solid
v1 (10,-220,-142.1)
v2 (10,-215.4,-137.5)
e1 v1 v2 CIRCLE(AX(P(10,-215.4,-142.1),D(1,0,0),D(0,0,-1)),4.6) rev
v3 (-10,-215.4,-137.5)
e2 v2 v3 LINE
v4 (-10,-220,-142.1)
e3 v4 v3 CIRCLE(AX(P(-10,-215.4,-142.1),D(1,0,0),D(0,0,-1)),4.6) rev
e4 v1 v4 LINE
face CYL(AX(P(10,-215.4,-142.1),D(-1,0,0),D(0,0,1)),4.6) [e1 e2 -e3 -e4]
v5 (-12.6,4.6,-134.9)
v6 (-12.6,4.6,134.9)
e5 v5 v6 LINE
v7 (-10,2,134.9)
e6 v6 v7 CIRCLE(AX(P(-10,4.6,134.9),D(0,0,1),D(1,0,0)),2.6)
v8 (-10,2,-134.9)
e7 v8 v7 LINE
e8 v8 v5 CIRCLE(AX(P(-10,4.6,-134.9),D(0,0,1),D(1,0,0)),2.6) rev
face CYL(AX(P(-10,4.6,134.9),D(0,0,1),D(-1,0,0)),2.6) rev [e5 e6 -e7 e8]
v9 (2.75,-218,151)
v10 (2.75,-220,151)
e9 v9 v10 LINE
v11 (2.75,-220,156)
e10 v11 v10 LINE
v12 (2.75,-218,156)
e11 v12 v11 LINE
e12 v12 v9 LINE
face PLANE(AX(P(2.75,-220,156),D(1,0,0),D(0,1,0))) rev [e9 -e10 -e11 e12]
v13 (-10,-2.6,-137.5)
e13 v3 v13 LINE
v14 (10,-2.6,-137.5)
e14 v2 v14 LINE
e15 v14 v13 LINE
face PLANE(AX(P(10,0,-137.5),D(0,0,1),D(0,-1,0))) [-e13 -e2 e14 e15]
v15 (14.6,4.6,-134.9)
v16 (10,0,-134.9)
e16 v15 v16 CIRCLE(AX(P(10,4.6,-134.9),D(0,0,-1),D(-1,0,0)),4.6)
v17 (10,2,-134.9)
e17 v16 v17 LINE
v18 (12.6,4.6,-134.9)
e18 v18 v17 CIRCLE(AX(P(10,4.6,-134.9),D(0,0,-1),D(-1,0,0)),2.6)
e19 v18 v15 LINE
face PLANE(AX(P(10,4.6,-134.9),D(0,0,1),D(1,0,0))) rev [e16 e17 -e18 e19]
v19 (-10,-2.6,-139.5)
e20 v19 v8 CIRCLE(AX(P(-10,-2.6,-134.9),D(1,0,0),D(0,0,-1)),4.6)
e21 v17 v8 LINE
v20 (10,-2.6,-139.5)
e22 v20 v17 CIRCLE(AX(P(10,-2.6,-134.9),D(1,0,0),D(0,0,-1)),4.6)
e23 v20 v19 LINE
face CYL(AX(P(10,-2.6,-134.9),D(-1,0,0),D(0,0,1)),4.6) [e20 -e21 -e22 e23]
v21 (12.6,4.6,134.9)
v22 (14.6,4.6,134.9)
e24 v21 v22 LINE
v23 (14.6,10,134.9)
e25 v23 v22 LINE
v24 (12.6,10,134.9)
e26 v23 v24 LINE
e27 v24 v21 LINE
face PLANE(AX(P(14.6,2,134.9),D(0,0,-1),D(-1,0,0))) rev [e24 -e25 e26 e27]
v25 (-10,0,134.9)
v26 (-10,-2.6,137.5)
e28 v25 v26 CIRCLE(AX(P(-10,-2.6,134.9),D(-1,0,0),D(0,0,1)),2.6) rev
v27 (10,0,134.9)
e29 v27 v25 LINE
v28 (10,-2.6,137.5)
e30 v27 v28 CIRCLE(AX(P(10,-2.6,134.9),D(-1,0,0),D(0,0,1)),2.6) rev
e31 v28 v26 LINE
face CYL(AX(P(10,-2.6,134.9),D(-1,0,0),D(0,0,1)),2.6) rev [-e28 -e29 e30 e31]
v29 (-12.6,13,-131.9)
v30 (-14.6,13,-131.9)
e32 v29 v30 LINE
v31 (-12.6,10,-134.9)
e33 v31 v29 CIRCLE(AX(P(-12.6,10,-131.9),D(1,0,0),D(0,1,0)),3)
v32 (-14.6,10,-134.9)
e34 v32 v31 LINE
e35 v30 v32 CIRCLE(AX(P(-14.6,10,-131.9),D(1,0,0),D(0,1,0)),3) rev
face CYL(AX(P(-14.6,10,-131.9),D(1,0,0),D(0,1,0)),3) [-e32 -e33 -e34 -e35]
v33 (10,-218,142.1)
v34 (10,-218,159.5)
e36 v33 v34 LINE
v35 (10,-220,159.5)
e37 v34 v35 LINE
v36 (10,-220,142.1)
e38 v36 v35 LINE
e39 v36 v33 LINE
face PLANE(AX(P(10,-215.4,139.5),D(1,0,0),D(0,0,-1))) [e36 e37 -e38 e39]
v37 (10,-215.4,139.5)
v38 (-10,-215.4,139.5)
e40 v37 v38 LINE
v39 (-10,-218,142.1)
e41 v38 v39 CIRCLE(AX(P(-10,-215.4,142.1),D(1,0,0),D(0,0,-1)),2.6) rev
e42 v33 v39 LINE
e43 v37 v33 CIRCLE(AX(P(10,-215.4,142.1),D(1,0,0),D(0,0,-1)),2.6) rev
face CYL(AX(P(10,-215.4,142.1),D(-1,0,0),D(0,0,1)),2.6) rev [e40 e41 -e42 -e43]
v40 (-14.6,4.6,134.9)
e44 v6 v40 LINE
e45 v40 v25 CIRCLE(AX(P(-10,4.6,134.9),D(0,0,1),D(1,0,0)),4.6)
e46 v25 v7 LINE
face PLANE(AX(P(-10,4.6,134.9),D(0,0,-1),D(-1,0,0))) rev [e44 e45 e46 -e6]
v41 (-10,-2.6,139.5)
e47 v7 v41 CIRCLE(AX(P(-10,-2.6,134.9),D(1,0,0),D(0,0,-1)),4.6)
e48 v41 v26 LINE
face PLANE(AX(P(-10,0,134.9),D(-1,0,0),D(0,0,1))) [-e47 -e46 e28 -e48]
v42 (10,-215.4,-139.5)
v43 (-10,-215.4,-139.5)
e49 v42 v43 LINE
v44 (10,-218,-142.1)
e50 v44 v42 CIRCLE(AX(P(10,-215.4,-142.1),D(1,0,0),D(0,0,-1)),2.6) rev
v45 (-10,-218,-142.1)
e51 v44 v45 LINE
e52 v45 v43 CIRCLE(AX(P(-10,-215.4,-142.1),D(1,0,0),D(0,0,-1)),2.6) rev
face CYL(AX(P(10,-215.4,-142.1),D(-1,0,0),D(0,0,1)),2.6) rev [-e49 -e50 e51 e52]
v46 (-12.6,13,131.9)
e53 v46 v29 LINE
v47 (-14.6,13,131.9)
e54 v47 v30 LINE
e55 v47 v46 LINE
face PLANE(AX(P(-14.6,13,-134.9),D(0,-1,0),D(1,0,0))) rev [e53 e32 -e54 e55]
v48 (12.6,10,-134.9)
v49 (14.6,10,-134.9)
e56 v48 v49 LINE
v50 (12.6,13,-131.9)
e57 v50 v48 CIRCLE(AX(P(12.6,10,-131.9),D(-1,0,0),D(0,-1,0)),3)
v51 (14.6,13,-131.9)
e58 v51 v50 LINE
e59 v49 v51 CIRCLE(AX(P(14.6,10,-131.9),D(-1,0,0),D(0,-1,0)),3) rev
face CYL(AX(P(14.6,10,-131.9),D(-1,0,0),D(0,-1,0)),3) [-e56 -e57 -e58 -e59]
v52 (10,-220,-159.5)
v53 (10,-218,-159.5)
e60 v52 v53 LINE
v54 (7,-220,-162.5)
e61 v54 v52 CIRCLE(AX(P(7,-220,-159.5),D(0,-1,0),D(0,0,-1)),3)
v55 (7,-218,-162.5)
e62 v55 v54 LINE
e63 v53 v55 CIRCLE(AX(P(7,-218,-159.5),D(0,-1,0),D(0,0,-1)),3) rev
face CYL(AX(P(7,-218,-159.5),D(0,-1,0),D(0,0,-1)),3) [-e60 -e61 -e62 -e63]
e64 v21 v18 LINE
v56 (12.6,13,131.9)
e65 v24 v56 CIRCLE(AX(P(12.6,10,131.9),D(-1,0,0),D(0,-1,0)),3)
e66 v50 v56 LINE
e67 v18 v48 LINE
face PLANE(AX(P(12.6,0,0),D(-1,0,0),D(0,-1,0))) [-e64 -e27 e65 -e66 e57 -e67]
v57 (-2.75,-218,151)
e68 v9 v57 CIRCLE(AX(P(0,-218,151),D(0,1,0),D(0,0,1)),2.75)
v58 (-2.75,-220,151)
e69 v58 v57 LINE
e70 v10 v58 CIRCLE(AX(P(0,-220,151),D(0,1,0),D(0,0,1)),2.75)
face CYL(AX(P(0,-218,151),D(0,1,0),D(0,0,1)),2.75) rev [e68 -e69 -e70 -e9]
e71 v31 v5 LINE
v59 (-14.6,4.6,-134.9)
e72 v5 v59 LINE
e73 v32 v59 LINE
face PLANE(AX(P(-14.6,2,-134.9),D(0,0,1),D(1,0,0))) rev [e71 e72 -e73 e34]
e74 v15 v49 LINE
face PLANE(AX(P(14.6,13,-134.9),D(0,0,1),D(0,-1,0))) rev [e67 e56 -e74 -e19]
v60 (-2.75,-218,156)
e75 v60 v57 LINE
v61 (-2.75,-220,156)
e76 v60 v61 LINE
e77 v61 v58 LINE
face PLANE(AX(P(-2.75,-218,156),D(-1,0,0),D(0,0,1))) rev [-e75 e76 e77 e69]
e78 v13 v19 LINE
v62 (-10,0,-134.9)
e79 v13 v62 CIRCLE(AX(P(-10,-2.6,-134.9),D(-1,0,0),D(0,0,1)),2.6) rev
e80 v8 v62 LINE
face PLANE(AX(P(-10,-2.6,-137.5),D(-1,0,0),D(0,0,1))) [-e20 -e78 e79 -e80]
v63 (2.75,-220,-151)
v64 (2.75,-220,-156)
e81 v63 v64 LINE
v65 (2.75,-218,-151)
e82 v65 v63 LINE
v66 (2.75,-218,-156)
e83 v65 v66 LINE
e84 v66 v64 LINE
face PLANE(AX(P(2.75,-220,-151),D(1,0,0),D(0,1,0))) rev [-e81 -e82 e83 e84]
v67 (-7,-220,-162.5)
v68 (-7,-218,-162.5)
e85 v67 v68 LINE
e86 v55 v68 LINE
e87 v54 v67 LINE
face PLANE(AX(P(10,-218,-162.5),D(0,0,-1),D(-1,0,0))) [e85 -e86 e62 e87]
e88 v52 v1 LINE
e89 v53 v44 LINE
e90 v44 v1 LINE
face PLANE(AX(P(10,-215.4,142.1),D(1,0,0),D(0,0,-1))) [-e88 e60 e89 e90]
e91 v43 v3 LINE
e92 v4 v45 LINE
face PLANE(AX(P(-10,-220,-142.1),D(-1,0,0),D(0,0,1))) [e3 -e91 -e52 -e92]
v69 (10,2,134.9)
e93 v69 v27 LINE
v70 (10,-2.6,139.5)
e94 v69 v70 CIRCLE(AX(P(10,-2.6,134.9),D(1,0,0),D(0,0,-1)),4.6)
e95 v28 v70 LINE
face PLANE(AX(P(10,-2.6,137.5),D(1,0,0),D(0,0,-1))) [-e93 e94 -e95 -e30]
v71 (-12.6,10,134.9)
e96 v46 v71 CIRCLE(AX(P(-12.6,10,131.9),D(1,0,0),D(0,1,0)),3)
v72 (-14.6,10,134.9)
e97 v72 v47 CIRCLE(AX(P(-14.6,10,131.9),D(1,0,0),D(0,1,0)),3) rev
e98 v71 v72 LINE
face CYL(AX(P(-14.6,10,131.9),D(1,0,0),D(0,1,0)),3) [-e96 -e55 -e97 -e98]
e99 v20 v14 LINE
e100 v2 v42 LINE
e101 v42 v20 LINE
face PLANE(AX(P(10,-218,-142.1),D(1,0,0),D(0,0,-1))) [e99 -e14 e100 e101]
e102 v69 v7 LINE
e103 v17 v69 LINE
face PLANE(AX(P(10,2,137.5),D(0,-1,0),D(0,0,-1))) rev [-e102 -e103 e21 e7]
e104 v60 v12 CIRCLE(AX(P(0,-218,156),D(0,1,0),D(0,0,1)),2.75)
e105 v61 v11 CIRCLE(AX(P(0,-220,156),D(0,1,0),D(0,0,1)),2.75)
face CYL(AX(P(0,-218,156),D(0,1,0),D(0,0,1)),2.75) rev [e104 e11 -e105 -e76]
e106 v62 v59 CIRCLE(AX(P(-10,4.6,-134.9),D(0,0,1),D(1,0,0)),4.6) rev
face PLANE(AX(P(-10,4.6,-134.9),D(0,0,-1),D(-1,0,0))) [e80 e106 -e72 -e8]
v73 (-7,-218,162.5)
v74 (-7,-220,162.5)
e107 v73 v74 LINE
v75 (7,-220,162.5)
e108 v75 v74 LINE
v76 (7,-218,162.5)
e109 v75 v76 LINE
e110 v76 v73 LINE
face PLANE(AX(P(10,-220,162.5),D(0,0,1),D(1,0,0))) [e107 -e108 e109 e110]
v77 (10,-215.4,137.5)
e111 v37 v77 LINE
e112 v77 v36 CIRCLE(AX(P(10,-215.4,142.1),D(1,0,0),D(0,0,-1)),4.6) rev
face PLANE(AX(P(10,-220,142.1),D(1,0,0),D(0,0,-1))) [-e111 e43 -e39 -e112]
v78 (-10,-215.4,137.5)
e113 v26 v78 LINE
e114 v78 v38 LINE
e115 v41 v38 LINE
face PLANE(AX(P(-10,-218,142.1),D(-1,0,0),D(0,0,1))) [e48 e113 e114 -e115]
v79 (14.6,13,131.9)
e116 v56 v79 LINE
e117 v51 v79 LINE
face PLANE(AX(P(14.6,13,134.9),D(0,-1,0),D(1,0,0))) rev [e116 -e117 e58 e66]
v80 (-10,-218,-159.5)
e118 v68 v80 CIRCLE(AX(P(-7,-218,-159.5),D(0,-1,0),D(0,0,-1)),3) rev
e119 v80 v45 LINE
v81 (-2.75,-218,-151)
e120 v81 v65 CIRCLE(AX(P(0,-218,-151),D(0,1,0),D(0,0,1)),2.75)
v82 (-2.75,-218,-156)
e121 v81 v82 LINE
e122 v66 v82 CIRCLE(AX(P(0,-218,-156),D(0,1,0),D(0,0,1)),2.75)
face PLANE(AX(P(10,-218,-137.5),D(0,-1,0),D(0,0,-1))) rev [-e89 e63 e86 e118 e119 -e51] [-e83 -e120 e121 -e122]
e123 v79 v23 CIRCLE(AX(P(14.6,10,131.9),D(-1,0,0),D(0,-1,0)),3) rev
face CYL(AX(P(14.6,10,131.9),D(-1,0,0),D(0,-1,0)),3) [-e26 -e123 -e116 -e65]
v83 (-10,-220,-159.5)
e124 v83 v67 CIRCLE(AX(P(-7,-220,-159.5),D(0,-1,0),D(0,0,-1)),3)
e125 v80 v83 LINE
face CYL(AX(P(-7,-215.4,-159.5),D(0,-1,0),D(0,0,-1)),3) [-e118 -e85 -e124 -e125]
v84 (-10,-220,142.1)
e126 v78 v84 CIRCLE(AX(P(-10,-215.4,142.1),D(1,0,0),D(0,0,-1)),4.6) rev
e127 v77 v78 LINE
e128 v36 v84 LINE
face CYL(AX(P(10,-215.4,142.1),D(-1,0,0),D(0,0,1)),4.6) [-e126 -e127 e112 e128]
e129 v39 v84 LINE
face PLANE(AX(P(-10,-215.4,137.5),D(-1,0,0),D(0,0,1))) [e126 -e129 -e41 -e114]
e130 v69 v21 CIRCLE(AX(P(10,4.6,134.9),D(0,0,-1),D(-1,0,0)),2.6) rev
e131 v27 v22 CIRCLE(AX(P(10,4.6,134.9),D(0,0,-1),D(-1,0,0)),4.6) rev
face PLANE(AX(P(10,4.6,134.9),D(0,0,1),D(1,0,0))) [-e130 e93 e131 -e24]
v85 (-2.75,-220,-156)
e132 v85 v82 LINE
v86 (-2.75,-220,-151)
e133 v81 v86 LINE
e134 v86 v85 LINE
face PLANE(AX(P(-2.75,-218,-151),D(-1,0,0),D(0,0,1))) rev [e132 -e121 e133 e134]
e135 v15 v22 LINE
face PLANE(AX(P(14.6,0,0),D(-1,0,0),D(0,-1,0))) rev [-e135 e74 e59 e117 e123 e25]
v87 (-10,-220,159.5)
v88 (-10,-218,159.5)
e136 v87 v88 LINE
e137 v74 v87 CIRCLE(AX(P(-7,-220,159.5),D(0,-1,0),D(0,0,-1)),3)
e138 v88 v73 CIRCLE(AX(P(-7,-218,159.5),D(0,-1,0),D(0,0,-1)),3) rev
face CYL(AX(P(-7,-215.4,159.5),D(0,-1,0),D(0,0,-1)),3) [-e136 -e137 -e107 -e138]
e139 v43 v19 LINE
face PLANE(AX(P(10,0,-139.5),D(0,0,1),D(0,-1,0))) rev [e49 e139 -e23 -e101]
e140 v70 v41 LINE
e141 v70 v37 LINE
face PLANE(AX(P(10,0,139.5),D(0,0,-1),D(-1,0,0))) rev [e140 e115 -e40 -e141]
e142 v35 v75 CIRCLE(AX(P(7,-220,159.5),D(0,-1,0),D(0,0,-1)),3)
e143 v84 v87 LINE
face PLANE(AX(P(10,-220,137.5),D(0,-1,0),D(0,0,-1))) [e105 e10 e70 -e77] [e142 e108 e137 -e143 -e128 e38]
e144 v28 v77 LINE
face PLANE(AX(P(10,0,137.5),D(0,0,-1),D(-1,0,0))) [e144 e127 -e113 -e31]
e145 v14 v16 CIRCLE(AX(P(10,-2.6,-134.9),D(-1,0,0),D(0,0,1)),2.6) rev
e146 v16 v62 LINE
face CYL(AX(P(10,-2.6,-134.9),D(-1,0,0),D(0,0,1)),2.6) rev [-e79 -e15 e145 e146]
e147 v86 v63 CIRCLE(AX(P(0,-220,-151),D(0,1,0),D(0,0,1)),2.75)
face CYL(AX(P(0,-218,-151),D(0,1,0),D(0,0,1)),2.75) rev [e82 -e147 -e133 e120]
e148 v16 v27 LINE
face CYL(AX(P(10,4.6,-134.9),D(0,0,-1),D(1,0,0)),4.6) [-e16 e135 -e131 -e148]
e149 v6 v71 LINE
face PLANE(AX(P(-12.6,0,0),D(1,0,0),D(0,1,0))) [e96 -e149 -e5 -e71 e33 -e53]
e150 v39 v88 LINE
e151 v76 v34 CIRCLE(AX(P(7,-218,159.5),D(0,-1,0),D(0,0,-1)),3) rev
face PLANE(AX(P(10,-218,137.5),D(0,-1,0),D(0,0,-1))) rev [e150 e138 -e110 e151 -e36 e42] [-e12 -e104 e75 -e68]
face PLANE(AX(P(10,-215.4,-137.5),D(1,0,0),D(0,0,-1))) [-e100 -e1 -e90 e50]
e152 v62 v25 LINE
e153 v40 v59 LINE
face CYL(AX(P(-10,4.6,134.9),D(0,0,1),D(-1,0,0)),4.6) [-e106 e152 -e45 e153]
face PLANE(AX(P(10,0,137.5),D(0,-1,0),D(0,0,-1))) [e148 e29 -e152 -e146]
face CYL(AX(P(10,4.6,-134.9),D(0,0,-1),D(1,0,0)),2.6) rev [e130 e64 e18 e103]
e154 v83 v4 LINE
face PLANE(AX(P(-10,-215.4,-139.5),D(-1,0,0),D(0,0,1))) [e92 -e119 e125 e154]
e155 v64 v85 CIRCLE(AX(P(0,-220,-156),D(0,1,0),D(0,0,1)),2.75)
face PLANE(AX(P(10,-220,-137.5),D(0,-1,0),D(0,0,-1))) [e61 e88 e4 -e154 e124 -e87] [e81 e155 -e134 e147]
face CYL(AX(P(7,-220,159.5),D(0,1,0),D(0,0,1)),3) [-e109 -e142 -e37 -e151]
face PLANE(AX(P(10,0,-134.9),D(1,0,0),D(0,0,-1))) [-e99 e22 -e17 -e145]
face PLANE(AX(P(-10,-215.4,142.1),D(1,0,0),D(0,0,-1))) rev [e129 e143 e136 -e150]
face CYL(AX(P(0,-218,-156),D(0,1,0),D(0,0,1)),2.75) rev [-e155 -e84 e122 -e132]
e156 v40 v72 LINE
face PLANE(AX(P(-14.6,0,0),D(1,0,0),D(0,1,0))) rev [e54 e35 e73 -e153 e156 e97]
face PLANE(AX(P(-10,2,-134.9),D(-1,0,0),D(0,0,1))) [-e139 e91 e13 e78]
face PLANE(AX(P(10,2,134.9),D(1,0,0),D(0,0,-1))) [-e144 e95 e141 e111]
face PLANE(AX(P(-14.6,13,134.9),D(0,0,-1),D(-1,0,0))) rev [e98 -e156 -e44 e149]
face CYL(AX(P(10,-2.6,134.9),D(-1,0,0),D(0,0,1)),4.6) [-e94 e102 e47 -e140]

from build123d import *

# Parameters (mm, degrees)
ODGI_CIE_BAZOWE1_DEPTH        = 10
ODGI_CIE_KRAW_DZI1_DEPTH      = 269.8
ODGI_CIE_KRAW_DZI1_BEND_DEPTH = 269.8
SZCZELINA_START               = -220
SZCZELINA_POD_RUB_M51_DEPTH   = 2
ZAOKR_GLENIE1_R               = 3


# Read off the part's stored shape, not the designer's step: Szczelina pod śrubę M51
# Sheet-metal steps are written as plain solids
with BuildPart() as part:
    # Szkic1 → Odgięcie bazowe1 (new, symmetric)
    with BuildSketch(Plane(origin=(0, 0, 0), x_dir=(0, 0, -1), z_dir=(1, 0, 0))):
        with BuildLine():
            Line((-162.5, -220), (-142.1, -220))
            ThreePointArc((-142.1, -220), (-138.847308807, -218.652691193), (-137.5, -215.4))
            Line((-137.5, -215.4), (-137.5, -2.6))
            ThreePointArc((-137.5, -2.6), (-136.738477631, -0.761522369), (-134.9, 0))
            Line((-134.9, 0), (134.9, 0))
            ThreePointArc((134.9, 0), (136.738477631, -0.761522369), (137.5, -2.6))
            Line((137.5, -2.6), (137.5, -215.4))
            ThreePointArc((137.5, -215.4), (138.847308807, -218.652691193), (142.1, -220))
            Line((142.1, -220), (162.5, -220))
            Line((162.5, -220), (162.5, -218))
            Line((162.5, -218), (142.1, -218))
            ThreePointArc((142.1, -218), (140.261522369, -217.238477631), (139.5, -215.4))
            Line((139.5, -215.4), (139.5, -2.6))
            ThreePointArc((139.5, -2.6), (138.152691193, 0.652691193), (134.9, 2))
            Line((134.9, 2), (-134.9, 2))
            ThreePointArc((-134.9, 2), (-138.152691193, 0.652691193), (-139.5, -2.6))
            Line((-139.5, -2.6), (-139.5, -215.4))
            ThreePointArc((-139.5, -215.4), (-140.261522369, -217.238477631), (-142.1, -218))
            Line((-142.1, -218), (-162.5, -218))
            Line((-162.5, -218), (-162.5, -220))
        make_face()
    extrude(amount=ODGI_CIE_BAZOWE1_DEPTH, both=True)

    # Odgięcie krawędzi1 section (across the edge) → Odgięcie krawędzi1 (add)
    with BuildSketch(Plane(origin=(12.6, 2, 134.9), x_dir=(-1, 0, 0), z_dir=(0, 0, -1))):
        with BuildLine():
            Line((-2, 2.6), (-2, 11))
            Line((-2, 11), (0, 11))
            Line((0, 11), (0, 2.6))
            ThreePointArc((0, 2.6), (0.761522369, 0.761522369), (2.6, 0))
            Line((2.6, 0), (2.6, -2))
            ThreePointArc((2.6, -2), (-0.652691193, -0.652691193), (-2, 2.6))
        make_face()
    extrude(amount=ODGI_CIE_KRAW_DZI1_DEPTH)

    # Odgięcie krawędzi1 section 2 (across the edge) → Odgięcie krawędzi1 bend (add)
    with BuildSketch(Plane(origin=(-12.6, 2, -134.9), x_dir=(1, 0, 0), z_dir=(0, 0, 1))):
        with BuildLine():
            Line((-2, 2.6), (-2, 11))
            Line((-2, 11), (0, 11))
            Line((0, 11), (0, 2.6))
            ThreePointArc((0, 2.6), (0.761522369, 0.761522369), (2.6, 0))
            Line((2.6, 0), (2.6, -2))
            ThreePointArc((2.6, -2), (-0.652691193, -0.652691193), (-2, 2.6))
        make_face()
    extrude(amount=ODGI_CIE_KRAW_DZI1_BEND_DEPTH)

    # Szczelina pod śrubę M51 outline → Szczelina pod śrubę M51 (cut)
    with BuildSketch(Plane(origin=(0, 0, 0), x_dir=(1, 0, 0), z_dir=(0, 1, 0)).offset(SZCZELINA_START)):
        with BuildLine():
            Line((2.75, 151), (2.75, 156))
            ThreePointArc((2.75, 156), (0, 158.75), (-2.75, 156))
            Line((-2.75, 156), (-2.75, 151))
            ThreePointArc((-2.75, 151), (0, 148.25), (2.75, 151))
        make_face()
        with BuildLine():
            ThreePointArc((2.75, -151), (0, -148.25), (-2.75, -151))
            Line((-2.75, -151), (-2.75, -156))
            ThreePointArc((-2.75, -156), (0, -158.75), (2.75, -156))
            Line((2.75, -156), (2.75, -151))
        make_face()
    extrude(amount=SZCZELINA_POD_RUB_M51_DEPTH, mode=Mode.SUBTRACT)

    # Zaokrąglenie1
    zaokr_glenie1_edges = [part.edges().sort_by_distance(p)[0] for p in [
        (-13.6, 13, 134.9),
        (-10, -219, -162.5),
        (-10, -219, 162.5),
        (10, -219, -162.5),
        (13.6, 13, 134.9),
        (13.6, 13, -134.9),
        (10, -219, 162.5),
        (-13.6, 13, -134.9),
    ]]
    fillet(zaokr_glenie1_edges, radius=ZAOKR_GLENIE1_R)


solid = part.part
